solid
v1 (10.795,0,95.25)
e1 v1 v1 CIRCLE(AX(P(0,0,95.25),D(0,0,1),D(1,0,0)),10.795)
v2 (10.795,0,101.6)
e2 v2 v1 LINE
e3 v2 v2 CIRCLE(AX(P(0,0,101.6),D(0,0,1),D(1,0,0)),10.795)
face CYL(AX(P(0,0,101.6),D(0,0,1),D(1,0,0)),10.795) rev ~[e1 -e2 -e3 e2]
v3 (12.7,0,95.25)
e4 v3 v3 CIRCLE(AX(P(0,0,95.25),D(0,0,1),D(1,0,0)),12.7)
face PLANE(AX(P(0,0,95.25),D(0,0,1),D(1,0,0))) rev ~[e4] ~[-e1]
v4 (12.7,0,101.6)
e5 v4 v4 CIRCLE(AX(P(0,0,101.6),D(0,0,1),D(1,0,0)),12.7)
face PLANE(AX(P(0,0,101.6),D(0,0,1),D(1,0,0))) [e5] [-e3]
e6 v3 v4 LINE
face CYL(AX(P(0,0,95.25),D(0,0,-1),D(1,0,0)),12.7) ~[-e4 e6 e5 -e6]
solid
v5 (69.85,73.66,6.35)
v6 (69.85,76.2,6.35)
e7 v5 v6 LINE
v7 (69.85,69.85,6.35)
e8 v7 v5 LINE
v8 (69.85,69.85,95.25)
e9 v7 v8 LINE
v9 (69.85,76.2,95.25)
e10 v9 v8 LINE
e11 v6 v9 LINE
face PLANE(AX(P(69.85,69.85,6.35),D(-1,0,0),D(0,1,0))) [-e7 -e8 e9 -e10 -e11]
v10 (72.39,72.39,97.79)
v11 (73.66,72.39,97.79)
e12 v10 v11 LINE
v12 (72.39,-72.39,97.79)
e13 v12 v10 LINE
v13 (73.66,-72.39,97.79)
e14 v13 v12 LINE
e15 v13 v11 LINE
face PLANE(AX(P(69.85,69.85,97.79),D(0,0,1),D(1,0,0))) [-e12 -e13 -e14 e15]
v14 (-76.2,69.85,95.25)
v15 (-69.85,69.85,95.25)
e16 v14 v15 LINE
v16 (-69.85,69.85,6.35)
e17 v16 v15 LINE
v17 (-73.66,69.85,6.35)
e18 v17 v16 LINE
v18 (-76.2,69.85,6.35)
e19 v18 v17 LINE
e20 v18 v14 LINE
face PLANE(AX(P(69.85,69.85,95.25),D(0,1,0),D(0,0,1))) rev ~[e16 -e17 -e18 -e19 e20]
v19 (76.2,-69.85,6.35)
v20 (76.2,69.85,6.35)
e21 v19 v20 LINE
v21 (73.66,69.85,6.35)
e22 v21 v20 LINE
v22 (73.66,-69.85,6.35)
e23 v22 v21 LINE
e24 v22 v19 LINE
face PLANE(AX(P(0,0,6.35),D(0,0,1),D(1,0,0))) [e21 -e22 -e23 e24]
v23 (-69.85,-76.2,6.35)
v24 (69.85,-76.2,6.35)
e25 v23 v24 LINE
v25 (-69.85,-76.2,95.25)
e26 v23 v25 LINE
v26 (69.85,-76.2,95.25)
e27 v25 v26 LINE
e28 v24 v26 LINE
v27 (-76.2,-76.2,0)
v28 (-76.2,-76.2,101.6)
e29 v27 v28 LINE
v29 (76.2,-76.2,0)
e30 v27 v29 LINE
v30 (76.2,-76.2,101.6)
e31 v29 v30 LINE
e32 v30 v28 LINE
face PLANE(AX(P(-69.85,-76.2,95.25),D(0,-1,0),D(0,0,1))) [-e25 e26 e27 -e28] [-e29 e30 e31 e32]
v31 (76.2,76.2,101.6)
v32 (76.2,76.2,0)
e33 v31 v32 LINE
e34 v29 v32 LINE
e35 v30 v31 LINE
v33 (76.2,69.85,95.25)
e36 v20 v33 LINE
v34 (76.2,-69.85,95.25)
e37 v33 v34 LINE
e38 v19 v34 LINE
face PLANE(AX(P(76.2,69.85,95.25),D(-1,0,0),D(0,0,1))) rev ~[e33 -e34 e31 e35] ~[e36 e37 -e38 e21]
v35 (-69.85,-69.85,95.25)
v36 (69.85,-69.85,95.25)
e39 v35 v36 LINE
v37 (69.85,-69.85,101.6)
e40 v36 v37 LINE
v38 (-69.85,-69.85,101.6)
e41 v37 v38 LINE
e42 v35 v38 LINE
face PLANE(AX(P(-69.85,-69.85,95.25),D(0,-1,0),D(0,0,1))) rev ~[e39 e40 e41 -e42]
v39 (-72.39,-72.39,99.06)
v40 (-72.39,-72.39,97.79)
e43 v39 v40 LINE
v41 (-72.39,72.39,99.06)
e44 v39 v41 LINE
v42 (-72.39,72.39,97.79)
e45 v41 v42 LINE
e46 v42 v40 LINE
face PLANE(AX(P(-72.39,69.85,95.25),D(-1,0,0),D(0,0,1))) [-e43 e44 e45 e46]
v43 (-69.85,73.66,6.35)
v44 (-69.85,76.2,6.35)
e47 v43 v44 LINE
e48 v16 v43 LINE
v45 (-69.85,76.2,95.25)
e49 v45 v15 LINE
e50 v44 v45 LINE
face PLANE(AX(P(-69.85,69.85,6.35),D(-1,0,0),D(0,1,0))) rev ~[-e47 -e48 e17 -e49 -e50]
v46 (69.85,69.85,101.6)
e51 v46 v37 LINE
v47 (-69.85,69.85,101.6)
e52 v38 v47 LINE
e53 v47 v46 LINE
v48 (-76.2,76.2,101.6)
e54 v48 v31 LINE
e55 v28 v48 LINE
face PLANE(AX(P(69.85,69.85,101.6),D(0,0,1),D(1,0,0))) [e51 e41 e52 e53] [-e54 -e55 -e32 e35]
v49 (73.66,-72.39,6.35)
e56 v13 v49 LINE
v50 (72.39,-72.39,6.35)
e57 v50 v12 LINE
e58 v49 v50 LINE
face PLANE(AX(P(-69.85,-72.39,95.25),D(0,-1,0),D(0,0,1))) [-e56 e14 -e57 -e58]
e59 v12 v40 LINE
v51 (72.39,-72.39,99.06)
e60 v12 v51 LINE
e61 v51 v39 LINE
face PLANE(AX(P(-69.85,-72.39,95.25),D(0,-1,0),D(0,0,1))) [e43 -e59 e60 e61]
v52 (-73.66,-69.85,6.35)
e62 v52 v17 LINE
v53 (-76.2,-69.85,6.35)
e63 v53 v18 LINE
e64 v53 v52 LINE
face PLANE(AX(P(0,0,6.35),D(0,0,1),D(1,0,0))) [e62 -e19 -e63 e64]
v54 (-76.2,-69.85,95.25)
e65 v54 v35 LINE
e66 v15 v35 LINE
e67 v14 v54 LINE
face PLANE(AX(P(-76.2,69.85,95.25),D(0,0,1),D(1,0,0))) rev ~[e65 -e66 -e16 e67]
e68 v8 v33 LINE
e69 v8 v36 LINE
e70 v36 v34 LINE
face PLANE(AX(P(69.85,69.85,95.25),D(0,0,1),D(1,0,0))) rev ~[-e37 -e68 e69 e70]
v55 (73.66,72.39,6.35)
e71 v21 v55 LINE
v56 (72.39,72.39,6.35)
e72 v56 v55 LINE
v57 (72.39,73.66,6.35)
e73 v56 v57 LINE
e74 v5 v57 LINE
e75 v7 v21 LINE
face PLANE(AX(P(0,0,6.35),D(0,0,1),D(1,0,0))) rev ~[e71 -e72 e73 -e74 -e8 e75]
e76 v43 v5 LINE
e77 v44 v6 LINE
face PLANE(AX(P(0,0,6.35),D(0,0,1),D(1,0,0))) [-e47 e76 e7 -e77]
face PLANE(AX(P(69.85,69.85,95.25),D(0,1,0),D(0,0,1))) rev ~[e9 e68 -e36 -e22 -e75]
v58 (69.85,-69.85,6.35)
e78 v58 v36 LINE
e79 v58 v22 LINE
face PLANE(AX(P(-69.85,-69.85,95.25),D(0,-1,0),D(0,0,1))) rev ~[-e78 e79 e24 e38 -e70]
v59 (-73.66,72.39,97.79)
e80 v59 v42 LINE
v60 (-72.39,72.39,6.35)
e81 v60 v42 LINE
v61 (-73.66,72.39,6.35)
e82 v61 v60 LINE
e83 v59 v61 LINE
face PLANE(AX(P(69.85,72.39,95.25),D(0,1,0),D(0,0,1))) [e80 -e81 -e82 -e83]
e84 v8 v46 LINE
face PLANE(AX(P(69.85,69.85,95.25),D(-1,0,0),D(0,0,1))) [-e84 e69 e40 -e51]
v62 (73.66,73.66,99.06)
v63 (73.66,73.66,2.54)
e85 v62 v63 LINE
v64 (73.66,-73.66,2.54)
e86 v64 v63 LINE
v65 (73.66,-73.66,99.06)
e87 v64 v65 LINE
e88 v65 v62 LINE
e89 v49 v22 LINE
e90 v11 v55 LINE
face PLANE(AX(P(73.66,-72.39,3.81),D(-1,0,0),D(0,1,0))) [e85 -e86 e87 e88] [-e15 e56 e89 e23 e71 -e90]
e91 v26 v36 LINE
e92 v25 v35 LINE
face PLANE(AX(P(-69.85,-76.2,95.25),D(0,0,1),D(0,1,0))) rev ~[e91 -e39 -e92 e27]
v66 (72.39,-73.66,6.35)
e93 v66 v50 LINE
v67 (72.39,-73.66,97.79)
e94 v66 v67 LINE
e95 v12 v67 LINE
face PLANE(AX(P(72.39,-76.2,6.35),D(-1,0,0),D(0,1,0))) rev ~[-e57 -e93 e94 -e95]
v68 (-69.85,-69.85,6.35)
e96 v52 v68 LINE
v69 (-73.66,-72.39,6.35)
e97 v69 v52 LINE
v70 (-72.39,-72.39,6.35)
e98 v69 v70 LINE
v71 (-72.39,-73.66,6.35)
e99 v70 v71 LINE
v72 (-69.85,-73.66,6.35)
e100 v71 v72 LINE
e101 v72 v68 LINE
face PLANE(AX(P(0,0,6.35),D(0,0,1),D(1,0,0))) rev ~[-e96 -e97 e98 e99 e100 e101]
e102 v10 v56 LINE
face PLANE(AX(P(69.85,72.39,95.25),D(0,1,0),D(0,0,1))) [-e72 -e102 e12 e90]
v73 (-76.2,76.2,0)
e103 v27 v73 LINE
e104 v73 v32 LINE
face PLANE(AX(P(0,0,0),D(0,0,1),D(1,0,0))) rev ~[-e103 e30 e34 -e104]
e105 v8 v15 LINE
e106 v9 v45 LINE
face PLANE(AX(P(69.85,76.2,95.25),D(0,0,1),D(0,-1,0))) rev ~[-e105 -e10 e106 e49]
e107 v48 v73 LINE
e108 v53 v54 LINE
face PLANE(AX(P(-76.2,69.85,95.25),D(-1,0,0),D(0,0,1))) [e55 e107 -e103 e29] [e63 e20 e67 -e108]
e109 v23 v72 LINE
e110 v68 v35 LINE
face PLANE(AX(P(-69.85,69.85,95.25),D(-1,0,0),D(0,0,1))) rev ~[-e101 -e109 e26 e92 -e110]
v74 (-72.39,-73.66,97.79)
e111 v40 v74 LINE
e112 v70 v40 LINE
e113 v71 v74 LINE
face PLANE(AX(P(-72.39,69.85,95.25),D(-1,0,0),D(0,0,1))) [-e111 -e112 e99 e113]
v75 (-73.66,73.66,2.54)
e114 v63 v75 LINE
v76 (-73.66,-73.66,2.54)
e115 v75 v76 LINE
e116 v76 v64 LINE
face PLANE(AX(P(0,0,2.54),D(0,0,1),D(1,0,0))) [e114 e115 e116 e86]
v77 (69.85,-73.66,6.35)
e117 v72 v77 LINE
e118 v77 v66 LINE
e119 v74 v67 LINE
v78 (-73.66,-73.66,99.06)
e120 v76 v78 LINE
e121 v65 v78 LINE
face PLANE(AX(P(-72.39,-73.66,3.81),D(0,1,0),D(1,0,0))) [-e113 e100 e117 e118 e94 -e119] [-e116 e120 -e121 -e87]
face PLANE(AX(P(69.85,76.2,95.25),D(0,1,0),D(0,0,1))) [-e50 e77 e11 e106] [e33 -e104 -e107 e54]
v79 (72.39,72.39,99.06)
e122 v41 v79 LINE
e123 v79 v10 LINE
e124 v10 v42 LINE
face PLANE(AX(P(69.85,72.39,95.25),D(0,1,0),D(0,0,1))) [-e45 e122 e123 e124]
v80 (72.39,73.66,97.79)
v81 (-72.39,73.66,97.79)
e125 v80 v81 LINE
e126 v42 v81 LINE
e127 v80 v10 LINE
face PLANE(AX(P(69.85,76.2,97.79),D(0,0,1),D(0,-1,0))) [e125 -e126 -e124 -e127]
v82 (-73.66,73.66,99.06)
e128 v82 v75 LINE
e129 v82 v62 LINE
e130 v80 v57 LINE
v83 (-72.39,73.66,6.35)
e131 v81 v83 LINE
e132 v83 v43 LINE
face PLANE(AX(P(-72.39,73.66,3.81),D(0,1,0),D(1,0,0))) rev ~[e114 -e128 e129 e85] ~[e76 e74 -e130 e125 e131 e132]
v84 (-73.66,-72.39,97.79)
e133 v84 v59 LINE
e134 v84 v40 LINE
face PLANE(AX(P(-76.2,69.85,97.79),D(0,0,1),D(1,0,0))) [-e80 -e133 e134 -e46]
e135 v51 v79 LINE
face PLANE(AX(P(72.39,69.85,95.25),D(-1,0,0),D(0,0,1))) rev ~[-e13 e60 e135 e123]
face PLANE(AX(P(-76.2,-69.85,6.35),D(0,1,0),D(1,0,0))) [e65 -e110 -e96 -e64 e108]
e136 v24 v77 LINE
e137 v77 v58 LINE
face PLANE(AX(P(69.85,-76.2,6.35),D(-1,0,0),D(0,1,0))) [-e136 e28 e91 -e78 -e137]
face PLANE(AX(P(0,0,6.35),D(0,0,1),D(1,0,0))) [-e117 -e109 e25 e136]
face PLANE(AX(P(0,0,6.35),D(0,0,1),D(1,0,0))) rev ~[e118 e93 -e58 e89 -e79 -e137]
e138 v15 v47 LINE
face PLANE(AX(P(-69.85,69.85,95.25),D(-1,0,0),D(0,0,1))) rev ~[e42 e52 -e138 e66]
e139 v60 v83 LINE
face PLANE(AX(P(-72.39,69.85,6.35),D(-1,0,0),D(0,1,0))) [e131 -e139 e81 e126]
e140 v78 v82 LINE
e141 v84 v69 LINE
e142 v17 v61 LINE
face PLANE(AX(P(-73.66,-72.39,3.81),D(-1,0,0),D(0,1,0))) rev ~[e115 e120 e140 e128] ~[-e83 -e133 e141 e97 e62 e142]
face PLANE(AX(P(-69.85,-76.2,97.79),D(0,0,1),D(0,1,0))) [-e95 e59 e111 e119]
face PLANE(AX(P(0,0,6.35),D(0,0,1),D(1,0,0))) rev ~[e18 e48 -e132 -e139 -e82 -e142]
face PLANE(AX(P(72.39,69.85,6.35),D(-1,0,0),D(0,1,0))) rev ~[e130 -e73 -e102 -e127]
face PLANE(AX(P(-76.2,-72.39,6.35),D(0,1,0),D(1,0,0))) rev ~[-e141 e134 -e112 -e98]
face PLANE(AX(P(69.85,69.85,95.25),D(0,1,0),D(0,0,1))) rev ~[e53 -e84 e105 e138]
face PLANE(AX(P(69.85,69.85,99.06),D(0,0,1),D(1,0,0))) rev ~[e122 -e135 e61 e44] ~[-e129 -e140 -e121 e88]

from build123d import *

# Parameters (mm, degrees)
F0_W      = 152.4
F0_H      = 152.4
F1_DEPTH  = 6.35
F2_W      = 6.35
F2_H      = 6.35
F3_DEPTH  = 95.25
F4_W      = 6.35
F4_H      = 6.35
F5_DEPTH  = 95.25
F6_W      = 6.35
F6_H      = 6.35
F7_DEPTH  = 95.25
F8_W      = 6.35
F8_H      = 6.35
F9_DEPTH  = 95.25
F10_W     = 6.35
F10_H     = 6.35
F11_DEPTH = 139.7
F12_W     = 6.35
F12_H     = 6.35
F13_DEPTH = 139.7
F14_W     = 6.35
F14_H     = 6.35
F15_DEPTH = 139.7
F16_W     = 6.35
F16_H     = 6.35
F17_DEPTH = 139.7
F18_T     = -2.54
F22_R     = 12.7
F23_DEPTH = 6.35
F24_R     = 10.795
F25_DEPTH = 25.4


# Not quite as in the source:
# - a shell that OpenCascade refuses in one call is made with other operations: the cavity is built on its own and cut out
# - the program builds the solid bodies; features that only make, move or delete a surface that nothing else refers to are left out


with BuildPart() as f1:
    # F0 (on Top) → F1 (new body)
    with BuildSketch(Plane.XY):
        Rectangle(F0_W, F0_H)
    extrude(amount=F1_DEPTH)

    # F2 (on face) → F3 (join)
    with BuildSketch(Plane.XY.offset(6.35)):
        with Locations((73.025, -73.025)):
            Rectangle(F2_W, F2_H)
    extrude(amount=F3_DEPTH)

    # F4 (on face) → F5 (join)
    with BuildSketch(Plane.XY.offset(6.35)):
        with Locations((73.025, 73.025)):
            Rectangle(F4_W, F4_H)
    extrude(amount=F5_DEPTH)

    # F6 (on face) → F7 (join)
    with BuildSketch(Plane.XY.offset(6.35)):
        with Locations((-73.025, 73.025)):
            Rectangle(F6_W, F6_H)
    extrude(amount=F7_DEPTH)

    # F8 (on face) → F9 (join)
    with BuildSketch(Plane.XY.offset(6.35)):
        with Locations((-73.025, -73.025)):
            Rectangle(F8_W, F8_H)
    extrude(amount=F9_DEPTH)

    # F10 (on face) → F11 (join)
    with BuildSketch(Plane(origin=(69.85, 0, 0), x_dir=(0, -1, 0), z_dir=(-1, 0, 0))):
        with Locations((-73.025, 98.425)):
            Rectangle(F10_W, F10_H)
    extrude(amount=F11_DEPTH)

    # F12 (on face) → F13 (join)
    with BuildSketch(Plane.XZ.offset(-69.85)):
        with Locations((-73.025, 98.425)):
            Rectangle(F12_W, F12_H)
    extrude(amount=F13_DEPTH)

    # F14 (on face) → F15 (join)
    with BuildSketch(Plane.YZ.offset(-69.85)):
        with Locations((-73.025, 98.425)):
            Rectangle(F14_W, F14_H)
    extrude(amount=F15_DEPTH)

    # F16 (on face) → F17 (join)
    with BuildSketch(Plane.XZ.offset(-69.85)):
        with Locations((73.025, 98.425)):
            Rectangle(F16_W, F16_H)
    extrude(amount=F17_DEPTH)

    # F18: a shell. OpenCascade refuses it in one call, so the cavity is built on its own and cut out:
    # the body offset inwards by the wall thickness, plus a prism from it out through each open face.
    f18_core = offset(f1.part, amount=F18_T, kind=Kind.INTERSECTION, mode=Mode.PRIVATE)
    f18_exits = [f18_core.faces().sort_by_distance(p)[0] for p in [
        (0, 0, 3.81),
    ]]
    add(f18_core, mode=Mode.SUBTRACT)
    extrude(f18_exits, amount=-F18_T, mode=Mode.SUBTRACT)


with BuildPart() as f23:
    # F22 (on offset) → F23 (new body)
    with BuildSketch(Plane.XY.offset(95.25)):
        Circle(F22_R)
    extrude(amount=F23_DEPTH)

    # F24 (on face) → F25 (cut)
    with BuildSketch(Plane.XY.offset(101.6)):
        Circle(F24_R)
    extrude(amount=-F25_DEPTH, mode=Mode.SUBTRACT)


solid = Compound([f1.part, f23.part])
